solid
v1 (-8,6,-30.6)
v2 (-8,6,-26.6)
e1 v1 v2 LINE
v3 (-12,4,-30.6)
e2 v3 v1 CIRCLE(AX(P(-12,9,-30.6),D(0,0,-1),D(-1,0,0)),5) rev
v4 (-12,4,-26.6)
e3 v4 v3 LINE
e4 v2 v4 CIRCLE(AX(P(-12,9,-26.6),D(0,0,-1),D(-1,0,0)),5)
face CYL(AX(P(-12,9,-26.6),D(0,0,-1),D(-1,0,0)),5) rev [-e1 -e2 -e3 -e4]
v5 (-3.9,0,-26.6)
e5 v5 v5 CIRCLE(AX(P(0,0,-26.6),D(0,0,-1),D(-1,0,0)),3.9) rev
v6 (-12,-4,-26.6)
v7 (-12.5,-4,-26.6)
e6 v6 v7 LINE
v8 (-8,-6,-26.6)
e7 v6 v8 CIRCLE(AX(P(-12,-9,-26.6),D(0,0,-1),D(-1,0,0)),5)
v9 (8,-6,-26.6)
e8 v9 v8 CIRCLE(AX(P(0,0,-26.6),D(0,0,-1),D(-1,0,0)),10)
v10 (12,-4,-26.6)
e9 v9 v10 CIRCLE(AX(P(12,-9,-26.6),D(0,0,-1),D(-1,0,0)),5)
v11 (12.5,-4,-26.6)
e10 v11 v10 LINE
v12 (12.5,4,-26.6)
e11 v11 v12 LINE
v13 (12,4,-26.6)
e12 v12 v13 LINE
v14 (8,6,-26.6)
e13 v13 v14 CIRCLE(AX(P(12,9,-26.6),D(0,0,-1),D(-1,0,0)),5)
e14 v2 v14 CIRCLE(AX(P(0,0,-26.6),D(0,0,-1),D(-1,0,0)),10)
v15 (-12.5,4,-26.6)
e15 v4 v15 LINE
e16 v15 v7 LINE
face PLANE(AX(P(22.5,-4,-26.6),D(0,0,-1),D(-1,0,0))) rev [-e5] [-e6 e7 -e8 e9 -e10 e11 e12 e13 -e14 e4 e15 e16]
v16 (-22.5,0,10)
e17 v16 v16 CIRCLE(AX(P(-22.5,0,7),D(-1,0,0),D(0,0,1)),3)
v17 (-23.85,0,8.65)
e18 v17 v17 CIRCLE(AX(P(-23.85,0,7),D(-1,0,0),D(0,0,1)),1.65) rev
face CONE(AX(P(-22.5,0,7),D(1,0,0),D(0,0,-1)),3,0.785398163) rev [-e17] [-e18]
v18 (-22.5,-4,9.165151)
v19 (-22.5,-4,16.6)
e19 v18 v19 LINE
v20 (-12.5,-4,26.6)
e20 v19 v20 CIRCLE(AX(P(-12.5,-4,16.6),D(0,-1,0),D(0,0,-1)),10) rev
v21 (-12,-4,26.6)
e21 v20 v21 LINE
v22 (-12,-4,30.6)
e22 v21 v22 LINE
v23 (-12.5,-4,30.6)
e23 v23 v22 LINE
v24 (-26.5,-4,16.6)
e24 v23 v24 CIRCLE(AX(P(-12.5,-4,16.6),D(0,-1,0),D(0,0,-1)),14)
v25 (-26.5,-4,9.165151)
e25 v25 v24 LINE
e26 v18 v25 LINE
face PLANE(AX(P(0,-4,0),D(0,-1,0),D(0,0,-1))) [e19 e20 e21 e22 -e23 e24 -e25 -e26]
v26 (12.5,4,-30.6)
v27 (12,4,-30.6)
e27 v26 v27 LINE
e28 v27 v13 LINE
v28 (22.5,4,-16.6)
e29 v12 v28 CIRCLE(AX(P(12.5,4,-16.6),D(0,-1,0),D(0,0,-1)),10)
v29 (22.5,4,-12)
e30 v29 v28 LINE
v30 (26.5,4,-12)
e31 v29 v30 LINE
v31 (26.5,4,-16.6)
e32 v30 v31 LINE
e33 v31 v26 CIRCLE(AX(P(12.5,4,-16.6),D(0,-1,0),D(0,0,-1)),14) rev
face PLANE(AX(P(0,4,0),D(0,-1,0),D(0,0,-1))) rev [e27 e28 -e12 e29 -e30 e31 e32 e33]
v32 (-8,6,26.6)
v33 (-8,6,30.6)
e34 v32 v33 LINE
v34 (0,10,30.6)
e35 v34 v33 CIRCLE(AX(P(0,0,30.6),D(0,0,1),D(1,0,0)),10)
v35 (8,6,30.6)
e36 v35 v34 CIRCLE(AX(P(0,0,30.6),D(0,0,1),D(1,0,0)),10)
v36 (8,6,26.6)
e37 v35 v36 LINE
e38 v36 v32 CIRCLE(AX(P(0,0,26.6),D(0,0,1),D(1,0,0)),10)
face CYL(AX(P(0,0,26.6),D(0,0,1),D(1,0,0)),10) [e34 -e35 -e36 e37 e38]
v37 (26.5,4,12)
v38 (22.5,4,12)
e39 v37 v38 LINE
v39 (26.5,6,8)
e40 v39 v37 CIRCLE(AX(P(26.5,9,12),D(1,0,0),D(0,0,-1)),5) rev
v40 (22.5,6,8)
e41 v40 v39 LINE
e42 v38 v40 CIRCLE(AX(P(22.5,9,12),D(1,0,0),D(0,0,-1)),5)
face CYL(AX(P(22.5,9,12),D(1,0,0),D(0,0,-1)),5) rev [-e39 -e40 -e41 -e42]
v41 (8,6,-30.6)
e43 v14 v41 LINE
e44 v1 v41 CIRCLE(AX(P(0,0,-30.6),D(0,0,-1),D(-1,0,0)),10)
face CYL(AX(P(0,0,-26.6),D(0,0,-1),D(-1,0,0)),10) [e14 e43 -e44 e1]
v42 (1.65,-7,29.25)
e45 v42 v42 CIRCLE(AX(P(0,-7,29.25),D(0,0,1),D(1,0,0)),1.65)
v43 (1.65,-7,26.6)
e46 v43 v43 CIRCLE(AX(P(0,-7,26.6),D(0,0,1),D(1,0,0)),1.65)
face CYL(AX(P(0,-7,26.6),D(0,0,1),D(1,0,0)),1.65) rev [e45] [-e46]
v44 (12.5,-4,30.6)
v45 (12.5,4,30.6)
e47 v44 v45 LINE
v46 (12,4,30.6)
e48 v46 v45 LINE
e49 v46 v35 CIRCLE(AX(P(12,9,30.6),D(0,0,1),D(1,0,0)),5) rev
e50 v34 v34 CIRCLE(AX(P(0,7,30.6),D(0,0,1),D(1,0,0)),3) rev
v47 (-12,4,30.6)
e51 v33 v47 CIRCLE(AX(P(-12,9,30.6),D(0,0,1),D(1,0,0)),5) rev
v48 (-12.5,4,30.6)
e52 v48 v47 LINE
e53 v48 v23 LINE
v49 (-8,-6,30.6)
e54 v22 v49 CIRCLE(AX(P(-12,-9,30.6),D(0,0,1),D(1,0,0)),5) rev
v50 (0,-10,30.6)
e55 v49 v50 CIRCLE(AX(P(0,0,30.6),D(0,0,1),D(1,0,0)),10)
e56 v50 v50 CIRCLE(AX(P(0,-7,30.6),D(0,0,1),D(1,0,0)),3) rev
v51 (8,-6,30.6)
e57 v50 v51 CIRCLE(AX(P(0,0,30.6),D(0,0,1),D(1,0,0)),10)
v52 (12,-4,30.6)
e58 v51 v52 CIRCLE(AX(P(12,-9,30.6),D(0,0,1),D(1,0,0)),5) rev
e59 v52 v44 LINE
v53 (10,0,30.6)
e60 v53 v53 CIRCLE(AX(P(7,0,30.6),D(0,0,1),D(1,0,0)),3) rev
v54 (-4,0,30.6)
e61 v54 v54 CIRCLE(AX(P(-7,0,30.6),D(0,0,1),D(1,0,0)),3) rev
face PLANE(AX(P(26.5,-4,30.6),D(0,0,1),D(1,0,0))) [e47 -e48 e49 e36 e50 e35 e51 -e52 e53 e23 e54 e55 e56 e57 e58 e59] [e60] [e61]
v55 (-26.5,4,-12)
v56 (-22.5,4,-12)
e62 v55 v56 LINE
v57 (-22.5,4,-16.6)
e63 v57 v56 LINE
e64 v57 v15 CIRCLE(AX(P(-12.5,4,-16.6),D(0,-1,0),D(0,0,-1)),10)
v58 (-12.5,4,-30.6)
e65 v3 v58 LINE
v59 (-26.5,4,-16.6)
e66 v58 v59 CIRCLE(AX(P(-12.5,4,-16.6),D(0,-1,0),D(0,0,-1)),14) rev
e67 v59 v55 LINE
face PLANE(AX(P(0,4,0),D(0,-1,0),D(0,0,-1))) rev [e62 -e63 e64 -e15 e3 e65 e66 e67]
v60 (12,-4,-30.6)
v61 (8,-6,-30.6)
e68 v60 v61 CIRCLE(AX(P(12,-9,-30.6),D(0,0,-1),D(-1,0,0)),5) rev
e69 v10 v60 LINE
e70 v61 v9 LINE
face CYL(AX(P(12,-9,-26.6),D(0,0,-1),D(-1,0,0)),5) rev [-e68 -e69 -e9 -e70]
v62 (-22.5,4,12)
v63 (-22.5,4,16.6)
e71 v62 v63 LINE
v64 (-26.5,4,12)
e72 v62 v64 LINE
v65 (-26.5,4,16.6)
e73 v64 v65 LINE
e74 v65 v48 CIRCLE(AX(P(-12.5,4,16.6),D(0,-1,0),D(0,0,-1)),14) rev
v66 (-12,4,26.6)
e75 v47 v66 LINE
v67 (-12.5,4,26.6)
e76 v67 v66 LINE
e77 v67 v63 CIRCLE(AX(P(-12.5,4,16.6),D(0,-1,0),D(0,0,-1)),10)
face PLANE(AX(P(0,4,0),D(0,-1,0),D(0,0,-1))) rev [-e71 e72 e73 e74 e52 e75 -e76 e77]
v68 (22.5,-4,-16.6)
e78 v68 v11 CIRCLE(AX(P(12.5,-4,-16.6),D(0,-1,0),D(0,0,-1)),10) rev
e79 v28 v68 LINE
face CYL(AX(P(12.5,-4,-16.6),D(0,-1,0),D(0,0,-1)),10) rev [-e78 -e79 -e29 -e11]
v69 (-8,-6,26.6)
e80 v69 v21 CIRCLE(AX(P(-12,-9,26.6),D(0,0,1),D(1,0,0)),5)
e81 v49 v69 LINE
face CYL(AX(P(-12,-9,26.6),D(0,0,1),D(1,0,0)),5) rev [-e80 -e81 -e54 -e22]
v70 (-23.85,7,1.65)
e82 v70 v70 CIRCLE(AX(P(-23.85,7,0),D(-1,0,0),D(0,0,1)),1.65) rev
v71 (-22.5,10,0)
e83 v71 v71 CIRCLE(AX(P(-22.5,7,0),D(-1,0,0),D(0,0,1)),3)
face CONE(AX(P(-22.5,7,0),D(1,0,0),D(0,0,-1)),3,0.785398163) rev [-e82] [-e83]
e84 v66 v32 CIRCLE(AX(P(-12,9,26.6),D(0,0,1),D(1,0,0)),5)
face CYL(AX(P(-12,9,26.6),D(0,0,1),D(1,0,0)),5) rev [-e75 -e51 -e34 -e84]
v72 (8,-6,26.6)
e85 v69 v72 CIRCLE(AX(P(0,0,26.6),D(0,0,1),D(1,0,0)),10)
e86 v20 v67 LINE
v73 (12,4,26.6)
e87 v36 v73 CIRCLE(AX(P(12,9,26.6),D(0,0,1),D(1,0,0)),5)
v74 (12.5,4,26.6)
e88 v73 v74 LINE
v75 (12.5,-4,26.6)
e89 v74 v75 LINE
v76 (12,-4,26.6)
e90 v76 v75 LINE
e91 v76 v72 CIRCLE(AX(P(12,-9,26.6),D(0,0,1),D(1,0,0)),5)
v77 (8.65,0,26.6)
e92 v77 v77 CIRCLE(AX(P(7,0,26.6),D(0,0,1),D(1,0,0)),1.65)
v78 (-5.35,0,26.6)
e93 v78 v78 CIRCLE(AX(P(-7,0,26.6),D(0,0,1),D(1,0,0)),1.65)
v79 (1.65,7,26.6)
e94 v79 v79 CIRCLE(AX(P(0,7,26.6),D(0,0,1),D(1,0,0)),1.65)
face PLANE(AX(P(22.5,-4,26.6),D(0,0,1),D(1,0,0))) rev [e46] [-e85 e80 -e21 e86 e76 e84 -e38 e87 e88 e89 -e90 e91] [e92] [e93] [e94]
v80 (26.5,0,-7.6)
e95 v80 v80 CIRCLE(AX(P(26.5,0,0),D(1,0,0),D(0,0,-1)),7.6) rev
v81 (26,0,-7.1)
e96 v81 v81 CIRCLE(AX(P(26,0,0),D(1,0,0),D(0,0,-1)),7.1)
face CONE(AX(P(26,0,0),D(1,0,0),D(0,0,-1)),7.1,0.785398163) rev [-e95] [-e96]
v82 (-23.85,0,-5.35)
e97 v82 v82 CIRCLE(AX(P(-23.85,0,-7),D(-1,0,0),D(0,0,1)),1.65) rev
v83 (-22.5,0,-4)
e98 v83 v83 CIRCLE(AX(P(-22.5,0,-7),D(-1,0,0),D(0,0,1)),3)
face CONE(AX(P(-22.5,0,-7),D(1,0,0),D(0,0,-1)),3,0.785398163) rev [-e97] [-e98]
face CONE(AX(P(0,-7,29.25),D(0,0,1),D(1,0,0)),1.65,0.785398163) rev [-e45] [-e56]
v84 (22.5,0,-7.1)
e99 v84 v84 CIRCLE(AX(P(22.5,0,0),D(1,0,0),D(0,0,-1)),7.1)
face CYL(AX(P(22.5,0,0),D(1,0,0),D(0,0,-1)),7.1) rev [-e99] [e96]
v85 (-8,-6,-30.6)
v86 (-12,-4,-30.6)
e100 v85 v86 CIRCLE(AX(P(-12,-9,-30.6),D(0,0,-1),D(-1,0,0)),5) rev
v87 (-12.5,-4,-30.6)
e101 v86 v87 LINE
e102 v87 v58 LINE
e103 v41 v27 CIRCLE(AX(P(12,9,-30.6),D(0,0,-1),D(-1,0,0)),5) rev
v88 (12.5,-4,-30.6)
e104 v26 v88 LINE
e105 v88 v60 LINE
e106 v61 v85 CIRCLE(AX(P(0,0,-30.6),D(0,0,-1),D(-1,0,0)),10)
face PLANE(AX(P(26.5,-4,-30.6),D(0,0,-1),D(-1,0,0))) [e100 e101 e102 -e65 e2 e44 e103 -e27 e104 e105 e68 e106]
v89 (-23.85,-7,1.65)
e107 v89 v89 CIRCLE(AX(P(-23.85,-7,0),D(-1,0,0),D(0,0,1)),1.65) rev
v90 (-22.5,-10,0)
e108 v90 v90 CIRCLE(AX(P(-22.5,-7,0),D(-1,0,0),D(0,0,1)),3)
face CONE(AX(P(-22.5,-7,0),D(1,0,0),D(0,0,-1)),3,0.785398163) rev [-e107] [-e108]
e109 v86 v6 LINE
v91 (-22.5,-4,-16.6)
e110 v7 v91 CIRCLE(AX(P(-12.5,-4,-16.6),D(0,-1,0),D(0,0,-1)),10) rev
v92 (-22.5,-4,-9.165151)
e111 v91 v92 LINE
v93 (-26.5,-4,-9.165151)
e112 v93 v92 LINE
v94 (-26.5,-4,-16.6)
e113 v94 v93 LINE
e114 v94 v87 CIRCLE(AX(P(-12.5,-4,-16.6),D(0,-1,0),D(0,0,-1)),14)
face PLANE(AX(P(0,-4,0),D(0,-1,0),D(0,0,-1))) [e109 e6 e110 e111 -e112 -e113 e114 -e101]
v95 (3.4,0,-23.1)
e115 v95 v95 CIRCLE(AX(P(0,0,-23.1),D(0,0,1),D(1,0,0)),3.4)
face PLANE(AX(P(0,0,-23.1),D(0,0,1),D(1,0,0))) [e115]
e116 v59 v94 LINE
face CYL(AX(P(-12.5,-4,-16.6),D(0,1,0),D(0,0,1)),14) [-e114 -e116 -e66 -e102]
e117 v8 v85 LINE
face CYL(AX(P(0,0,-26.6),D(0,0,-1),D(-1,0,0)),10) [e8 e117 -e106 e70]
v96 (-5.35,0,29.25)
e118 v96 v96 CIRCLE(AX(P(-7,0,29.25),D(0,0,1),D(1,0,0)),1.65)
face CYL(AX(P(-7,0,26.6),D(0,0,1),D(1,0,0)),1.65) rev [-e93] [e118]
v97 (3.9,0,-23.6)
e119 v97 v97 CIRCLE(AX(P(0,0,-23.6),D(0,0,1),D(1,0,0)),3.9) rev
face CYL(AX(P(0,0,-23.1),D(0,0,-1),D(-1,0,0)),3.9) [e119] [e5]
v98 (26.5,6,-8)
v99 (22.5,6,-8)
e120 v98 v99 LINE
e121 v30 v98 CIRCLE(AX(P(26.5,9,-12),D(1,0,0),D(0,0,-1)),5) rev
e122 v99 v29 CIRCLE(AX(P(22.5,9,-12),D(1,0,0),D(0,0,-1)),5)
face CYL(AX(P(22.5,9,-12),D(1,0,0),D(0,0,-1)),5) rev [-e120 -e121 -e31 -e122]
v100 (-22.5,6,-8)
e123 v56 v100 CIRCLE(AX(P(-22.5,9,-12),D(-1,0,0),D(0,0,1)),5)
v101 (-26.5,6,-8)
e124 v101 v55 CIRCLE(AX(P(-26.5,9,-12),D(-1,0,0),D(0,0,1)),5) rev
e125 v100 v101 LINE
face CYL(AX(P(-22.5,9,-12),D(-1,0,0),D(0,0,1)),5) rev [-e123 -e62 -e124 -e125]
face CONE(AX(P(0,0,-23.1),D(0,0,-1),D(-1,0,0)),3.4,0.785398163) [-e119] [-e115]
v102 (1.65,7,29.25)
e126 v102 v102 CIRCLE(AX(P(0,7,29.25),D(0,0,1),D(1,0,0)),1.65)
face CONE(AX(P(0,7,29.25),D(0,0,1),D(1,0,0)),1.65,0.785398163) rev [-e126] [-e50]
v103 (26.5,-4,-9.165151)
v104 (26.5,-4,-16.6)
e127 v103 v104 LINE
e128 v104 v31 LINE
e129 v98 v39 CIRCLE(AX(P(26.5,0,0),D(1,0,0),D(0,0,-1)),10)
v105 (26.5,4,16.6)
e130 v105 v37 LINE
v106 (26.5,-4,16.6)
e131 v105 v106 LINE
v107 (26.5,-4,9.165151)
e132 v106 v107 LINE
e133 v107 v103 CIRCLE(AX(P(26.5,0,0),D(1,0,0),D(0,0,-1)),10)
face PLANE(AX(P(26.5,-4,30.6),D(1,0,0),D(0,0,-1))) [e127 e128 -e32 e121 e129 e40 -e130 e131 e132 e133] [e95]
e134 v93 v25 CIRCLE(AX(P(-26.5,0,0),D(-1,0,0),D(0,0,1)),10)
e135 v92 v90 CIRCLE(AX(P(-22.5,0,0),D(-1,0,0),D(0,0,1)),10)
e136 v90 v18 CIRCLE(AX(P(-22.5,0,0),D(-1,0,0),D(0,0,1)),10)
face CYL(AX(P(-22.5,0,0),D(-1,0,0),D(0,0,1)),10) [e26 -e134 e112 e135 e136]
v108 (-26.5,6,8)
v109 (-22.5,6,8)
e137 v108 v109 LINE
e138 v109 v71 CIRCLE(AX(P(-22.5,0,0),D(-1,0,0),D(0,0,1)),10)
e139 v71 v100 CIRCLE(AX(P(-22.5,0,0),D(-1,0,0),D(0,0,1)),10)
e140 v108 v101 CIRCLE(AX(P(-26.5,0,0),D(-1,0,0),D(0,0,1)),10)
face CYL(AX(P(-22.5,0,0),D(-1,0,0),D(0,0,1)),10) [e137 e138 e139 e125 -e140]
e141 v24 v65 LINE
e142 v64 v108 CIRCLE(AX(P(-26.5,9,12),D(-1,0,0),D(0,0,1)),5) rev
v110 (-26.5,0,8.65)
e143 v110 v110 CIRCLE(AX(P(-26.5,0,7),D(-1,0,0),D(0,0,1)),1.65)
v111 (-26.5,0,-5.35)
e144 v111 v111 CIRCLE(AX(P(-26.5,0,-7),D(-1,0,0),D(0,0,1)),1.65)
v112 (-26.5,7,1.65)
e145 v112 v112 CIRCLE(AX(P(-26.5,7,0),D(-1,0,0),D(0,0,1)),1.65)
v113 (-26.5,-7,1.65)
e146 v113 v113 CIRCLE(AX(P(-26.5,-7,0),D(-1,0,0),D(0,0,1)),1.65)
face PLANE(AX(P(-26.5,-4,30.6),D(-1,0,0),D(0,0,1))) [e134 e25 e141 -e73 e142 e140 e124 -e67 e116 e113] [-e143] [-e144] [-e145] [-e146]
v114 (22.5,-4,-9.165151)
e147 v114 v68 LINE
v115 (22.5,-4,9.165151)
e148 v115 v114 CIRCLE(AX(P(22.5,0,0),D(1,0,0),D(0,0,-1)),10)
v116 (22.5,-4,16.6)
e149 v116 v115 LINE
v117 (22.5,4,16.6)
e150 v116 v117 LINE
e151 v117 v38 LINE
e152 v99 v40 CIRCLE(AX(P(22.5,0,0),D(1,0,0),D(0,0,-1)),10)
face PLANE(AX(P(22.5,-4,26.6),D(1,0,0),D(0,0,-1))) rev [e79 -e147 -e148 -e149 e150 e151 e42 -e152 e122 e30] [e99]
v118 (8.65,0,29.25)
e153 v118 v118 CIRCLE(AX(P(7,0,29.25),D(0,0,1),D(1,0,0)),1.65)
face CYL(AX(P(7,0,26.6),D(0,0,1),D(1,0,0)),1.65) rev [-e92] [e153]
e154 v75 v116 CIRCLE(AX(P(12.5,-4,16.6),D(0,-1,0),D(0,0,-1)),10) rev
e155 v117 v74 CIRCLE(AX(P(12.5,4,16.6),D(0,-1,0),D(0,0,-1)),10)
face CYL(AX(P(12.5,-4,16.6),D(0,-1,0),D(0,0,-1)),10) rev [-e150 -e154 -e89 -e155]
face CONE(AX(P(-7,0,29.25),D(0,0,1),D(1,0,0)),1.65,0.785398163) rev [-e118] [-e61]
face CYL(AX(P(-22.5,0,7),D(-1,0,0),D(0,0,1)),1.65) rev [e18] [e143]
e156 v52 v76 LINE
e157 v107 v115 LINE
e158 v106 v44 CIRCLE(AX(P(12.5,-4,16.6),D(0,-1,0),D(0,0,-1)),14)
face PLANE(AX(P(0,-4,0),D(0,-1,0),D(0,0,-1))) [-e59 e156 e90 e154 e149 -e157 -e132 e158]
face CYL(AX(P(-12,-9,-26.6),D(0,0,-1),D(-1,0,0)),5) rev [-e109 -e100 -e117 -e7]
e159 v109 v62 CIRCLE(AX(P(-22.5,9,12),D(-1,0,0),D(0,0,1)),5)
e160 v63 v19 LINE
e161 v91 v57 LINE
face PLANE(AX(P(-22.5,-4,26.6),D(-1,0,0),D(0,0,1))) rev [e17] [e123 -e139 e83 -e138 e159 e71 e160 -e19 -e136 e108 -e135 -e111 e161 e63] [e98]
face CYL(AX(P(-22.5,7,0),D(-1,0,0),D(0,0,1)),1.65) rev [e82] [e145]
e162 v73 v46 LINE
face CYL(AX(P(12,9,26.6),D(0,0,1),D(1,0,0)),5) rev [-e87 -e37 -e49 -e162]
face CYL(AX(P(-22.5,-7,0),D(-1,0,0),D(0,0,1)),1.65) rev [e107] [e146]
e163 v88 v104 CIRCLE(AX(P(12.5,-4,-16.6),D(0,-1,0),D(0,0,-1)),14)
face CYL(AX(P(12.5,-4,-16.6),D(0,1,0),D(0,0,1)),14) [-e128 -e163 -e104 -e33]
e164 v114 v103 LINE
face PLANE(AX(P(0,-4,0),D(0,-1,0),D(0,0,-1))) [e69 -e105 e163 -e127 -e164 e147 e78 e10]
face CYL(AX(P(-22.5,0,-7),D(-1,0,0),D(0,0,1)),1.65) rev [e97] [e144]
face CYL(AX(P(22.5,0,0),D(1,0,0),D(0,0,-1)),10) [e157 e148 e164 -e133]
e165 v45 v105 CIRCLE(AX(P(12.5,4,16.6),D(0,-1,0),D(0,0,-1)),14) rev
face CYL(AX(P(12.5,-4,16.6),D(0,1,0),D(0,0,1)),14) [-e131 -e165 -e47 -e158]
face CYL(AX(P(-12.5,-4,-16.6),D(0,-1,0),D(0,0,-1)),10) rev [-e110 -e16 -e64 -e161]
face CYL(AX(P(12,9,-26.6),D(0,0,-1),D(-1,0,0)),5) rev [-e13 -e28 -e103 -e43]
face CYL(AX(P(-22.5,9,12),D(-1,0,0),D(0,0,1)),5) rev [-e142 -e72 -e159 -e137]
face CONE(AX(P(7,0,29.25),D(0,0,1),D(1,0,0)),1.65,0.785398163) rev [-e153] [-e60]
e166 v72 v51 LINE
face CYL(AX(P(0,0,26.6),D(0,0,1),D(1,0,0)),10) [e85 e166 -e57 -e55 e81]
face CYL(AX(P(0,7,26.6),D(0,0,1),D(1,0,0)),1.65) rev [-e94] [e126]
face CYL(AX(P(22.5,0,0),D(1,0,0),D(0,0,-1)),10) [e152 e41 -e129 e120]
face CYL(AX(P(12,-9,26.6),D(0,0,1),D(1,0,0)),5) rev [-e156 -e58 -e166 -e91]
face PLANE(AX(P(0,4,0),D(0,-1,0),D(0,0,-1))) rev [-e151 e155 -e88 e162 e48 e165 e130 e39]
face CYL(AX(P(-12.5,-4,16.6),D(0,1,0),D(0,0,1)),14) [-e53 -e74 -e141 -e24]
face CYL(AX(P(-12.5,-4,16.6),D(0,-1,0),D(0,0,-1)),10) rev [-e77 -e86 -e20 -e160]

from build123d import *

# Parameters (mm, degrees)
BOSS_EXTRUDE1_DEPTH      = 4
BOSS_EXTRUDE1_DEPTH_BACK = 4
SKETCH4_W                = 53
SKETCH4_H                = 61.2
SKETCH4_W_2              = 45
SKETCH4_H_2              = 53.2
SKETCH5_R                = 10
BOSS_EXTRUDE2_DEPTH      = 4
BOSS_EXTRUDE3_START      = -4
SKETCH6_R                = 10
BOSS_EXTRUDE3_DEPTH      = 4
SKETCH7_R                = 1.65
CUT_EXTRUDE1_DEPTH       = 4
CHAMFER1_SIZE            = 1.35
SKETCH8_R                = 3.9
BOSS_EXTRUDE4_DEPTH      = 3.5
FILLET1_R                = 10
FILLET2_R                = 14
FILLET3_R                = 5
CHAMFER2_SIZE            = 0.5
SKETCH9_R                = 10
BOSS_EXTRUDE5_DEPTH      = 4
BOSS_EXTRUDE6_START      = -4
SKETCH10_R               = 10
BOSS_EXTRUDE6_DEPTH      = 4
SKETCH11_R               = 7.1
CUT_EXTRUDE2_DEPTH       = 4
SKETCH12_R               = 1.65
CUT_EXTRUDE3_DEPTH       = 4
CHAMFER3_SIZE            = 1.35
FILLET4_R                = 5
CHAMFER4_SIZE            = 0.5


with BuildPart() as part:
    # Sketch4 → Boss-Extrude1 (new, two sides: drawn at the far end of the back side and taken through both)
    with BuildSketch(Plane(origin=(0, 0, 0), x_dir=(1, 0, 0), z_dir=(0, 1, 0)).offset(-BOSS_EXTRUDE1_DEPTH_BACK)):
        Rectangle(SKETCH4_W, SKETCH4_H)
        Rectangle(SKETCH4_W_2, SKETCH4_H_2, mode=Mode.SUBTRACT)
    extrude(amount=BOSS_EXTRUDE1_DEPTH + BOSS_EXTRUDE1_DEPTH_BACK)

    # Sketch5 → Boss-Extrude2 (add)
    with BuildSketch(Plane.XY.offset(30.6)):
        Circle(SKETCH5_R)
    extrude(amount=-BOSS_EXTRUDE2_DEPTH)

    # Sketch6 → Boss-Extrude3 (add)
    with BuildSketch(Plane(origin=(0, 0, -30.6), x_dir=(-1, 0, 0), z_dir=(0, 0, -1)).offset(BOSS_EXTRUDE3_START)):
        Circle(SKETCH6_R)
    extrude(amount=BOSS_EXTRUDE3_DEPTH)

    # Sketch7 → Cut-Extrude1 (cut)
    with BuildSketch(Plane.XY.offset(30.6)):
        with Locations((0, 7)):
            Circle(SKETCH7_R)
        with Locations((7, 0)):
            Circle(SKETCH7_R)
        with Locations((0, -7)):
            Circle(SKETCH7_R)
        with Locations((-7, 0)):
            Circle(SKETCH7_R)
    extrude(amount=-CUT_EXTRUDE1_DEPTH, mode=Mode.SUBTRACT)

    # Chamfer1
    chamfer1_edges = [part.edges().sort_by_distance(p)[0] for p in [
        (-1.65, 7, 30.6),
        (5.35, 0, 30.6),
        (-1.65, -7, 30.6),
        (-8.65, 0, 30.6),
    ]]
    chamfer(chamfer1_edges, length=CHAMFER1_SIZE - 0.0001)  # a hair under: the kernel refuses the full size

    # Sketch8 → Boss-Extrude4 (add)
    with BuildSketch(Plane.XY.offset(-26.6)):
        with Locations(Location((0, 0, 0), (0, 0, 180))):
            Circle(SKETCH8_R)
    extrude(amount=BOSS_EXTRUDE4_DEPTH)

    # Fillet1
    fillet1_edges = [part.edges().sort_by_distance(p)[0] for p in [
        (-22.5, 0, 26.6),
        (-22.5, 0, -26.6),
        (22.5, 0, -26.6),
        (22.5, 0, 26.6),
    ]]
    fillet(fillet1_edges, radius=FILLET1_R)

    # Fillet2
    fillet2_edges = [part.edges().sort_by_distance(p)[0] for p in [
        (-26.5, 0, 30.6),
        (-26.5, 0, -30.6),
        (26.5, 0, -30.6),
        (26.5, 0, 30.6),
    ]]
    fillet(fillet2_edges, radius=FILLET2_R)

    # Fillet3
    fillet3_edges = [part.edges().sort_by_distance(p)[0] for p in [
        (-9.16515139, 4, 28.6),
        (9.16515139, 4, 28.6),
        (9.16515139, -4, 28.6),
        (-9.16515139, -4, 28.6),
        (9.16515139, 4, -28.6),
        (-9.16515139, 4, -28.6),
        (-9.16515139, -4, -28.6),
        (9.16515139, -4, -28.6),
    ]]
    fillet(fillet3_edges, radius=FILLET3_R)

    # Chamfer2
    chamfer2_edges = [part.edges().sort_by_distance(p)[0] for p in [
        (3.9, 0, -23.1),
    ]]
    chamfer(chamfer2_edges, length=CHAMFER2_SIZE)

    # Sketch9 → Boss-Extrude5 (add)
    with BuildSketch(Plane.ZY.offset(26.5)):
        Circle(SKETCH9_R)
    extrude(amount=-BOSS_EXTRUDE5_DEPTH)

    # Sketch10 → Boss-Extrude6 (add)
    with BuildSketch(Plane(origin=(26.5, 0, 0), x_dir=(0, 0, -1), z_dir=(1, 0, 0)).offset(BOSS_EXTRUDE6_START)):
        Circle(SKETCH10_R)
    extrude(amount=BOSS_EXTRUDE6_DEPTH)

    # Sketch11 → Cut-Extrude2 (cut)
    with BuildSketch(Plane(origin=(26.5, 0, 0), x_dir=(0, 0, -1), z_dir=(1, 0, 0))):
        Circle(SKETCH11_R)
    extrude(amount=-CUT_EXTRUDE2_DEPTH, mode=Mode.SUBTRACT)

    # Sketch12 → Cut-Extrude3 (cut)
    with BuildSketch(Plane.ZY.offset(26.5)):
        with Locations((0, 7)):
            Circle(SKETCH12_R)
        with Locations((7, 0)):
            Circle(SKETCH12_R)
        with Locations((0, -7)):
            Circle(SKETCH12_R)
        with Locations((-7, 0)):
            Circle(SKETCH12_R)
    extrude(amount=-CUT_EXTRUDE3_DEPTH, mode=Mode.SUBTRACT)

    # Chamfer3
    chamfer3_edges = [part.edges().sort_by_distance(p)[0] for p in [
        (-22.5, 7, -1.65),
        (-22.5, 0, 5.35),
        (-22.5, -7, -1.65),
        (-22.5, 0, -8.65),
    ]]
    chamfer(chamfer3_edges, length=CHAMFER3_SIZE - 0.0001)  # a hair under: the kernel refuses the full size

    # Fillet4
    fillet4_edges = [part.edges().sort_by_distance(p)[0] for p in [
        (-24.5, 4, 9.16515139),
        (-24.5, 4, -9.16515139),
        (24.5, 4, 9.16515139),
        (24.5, 4, -9.16515139),
    ]]
    fillet(fillet4_edges, radius=FILLET4_R)

    # Chamfer4
    chamfer4_edges = [part.edges().sort_by_distance(p)[0] for p in [
        (26.5, 0, 7.1),
    ]]
    chamfer(chamfer4_edges, length=CHAMFER4_SIZE)


solid = part.part
